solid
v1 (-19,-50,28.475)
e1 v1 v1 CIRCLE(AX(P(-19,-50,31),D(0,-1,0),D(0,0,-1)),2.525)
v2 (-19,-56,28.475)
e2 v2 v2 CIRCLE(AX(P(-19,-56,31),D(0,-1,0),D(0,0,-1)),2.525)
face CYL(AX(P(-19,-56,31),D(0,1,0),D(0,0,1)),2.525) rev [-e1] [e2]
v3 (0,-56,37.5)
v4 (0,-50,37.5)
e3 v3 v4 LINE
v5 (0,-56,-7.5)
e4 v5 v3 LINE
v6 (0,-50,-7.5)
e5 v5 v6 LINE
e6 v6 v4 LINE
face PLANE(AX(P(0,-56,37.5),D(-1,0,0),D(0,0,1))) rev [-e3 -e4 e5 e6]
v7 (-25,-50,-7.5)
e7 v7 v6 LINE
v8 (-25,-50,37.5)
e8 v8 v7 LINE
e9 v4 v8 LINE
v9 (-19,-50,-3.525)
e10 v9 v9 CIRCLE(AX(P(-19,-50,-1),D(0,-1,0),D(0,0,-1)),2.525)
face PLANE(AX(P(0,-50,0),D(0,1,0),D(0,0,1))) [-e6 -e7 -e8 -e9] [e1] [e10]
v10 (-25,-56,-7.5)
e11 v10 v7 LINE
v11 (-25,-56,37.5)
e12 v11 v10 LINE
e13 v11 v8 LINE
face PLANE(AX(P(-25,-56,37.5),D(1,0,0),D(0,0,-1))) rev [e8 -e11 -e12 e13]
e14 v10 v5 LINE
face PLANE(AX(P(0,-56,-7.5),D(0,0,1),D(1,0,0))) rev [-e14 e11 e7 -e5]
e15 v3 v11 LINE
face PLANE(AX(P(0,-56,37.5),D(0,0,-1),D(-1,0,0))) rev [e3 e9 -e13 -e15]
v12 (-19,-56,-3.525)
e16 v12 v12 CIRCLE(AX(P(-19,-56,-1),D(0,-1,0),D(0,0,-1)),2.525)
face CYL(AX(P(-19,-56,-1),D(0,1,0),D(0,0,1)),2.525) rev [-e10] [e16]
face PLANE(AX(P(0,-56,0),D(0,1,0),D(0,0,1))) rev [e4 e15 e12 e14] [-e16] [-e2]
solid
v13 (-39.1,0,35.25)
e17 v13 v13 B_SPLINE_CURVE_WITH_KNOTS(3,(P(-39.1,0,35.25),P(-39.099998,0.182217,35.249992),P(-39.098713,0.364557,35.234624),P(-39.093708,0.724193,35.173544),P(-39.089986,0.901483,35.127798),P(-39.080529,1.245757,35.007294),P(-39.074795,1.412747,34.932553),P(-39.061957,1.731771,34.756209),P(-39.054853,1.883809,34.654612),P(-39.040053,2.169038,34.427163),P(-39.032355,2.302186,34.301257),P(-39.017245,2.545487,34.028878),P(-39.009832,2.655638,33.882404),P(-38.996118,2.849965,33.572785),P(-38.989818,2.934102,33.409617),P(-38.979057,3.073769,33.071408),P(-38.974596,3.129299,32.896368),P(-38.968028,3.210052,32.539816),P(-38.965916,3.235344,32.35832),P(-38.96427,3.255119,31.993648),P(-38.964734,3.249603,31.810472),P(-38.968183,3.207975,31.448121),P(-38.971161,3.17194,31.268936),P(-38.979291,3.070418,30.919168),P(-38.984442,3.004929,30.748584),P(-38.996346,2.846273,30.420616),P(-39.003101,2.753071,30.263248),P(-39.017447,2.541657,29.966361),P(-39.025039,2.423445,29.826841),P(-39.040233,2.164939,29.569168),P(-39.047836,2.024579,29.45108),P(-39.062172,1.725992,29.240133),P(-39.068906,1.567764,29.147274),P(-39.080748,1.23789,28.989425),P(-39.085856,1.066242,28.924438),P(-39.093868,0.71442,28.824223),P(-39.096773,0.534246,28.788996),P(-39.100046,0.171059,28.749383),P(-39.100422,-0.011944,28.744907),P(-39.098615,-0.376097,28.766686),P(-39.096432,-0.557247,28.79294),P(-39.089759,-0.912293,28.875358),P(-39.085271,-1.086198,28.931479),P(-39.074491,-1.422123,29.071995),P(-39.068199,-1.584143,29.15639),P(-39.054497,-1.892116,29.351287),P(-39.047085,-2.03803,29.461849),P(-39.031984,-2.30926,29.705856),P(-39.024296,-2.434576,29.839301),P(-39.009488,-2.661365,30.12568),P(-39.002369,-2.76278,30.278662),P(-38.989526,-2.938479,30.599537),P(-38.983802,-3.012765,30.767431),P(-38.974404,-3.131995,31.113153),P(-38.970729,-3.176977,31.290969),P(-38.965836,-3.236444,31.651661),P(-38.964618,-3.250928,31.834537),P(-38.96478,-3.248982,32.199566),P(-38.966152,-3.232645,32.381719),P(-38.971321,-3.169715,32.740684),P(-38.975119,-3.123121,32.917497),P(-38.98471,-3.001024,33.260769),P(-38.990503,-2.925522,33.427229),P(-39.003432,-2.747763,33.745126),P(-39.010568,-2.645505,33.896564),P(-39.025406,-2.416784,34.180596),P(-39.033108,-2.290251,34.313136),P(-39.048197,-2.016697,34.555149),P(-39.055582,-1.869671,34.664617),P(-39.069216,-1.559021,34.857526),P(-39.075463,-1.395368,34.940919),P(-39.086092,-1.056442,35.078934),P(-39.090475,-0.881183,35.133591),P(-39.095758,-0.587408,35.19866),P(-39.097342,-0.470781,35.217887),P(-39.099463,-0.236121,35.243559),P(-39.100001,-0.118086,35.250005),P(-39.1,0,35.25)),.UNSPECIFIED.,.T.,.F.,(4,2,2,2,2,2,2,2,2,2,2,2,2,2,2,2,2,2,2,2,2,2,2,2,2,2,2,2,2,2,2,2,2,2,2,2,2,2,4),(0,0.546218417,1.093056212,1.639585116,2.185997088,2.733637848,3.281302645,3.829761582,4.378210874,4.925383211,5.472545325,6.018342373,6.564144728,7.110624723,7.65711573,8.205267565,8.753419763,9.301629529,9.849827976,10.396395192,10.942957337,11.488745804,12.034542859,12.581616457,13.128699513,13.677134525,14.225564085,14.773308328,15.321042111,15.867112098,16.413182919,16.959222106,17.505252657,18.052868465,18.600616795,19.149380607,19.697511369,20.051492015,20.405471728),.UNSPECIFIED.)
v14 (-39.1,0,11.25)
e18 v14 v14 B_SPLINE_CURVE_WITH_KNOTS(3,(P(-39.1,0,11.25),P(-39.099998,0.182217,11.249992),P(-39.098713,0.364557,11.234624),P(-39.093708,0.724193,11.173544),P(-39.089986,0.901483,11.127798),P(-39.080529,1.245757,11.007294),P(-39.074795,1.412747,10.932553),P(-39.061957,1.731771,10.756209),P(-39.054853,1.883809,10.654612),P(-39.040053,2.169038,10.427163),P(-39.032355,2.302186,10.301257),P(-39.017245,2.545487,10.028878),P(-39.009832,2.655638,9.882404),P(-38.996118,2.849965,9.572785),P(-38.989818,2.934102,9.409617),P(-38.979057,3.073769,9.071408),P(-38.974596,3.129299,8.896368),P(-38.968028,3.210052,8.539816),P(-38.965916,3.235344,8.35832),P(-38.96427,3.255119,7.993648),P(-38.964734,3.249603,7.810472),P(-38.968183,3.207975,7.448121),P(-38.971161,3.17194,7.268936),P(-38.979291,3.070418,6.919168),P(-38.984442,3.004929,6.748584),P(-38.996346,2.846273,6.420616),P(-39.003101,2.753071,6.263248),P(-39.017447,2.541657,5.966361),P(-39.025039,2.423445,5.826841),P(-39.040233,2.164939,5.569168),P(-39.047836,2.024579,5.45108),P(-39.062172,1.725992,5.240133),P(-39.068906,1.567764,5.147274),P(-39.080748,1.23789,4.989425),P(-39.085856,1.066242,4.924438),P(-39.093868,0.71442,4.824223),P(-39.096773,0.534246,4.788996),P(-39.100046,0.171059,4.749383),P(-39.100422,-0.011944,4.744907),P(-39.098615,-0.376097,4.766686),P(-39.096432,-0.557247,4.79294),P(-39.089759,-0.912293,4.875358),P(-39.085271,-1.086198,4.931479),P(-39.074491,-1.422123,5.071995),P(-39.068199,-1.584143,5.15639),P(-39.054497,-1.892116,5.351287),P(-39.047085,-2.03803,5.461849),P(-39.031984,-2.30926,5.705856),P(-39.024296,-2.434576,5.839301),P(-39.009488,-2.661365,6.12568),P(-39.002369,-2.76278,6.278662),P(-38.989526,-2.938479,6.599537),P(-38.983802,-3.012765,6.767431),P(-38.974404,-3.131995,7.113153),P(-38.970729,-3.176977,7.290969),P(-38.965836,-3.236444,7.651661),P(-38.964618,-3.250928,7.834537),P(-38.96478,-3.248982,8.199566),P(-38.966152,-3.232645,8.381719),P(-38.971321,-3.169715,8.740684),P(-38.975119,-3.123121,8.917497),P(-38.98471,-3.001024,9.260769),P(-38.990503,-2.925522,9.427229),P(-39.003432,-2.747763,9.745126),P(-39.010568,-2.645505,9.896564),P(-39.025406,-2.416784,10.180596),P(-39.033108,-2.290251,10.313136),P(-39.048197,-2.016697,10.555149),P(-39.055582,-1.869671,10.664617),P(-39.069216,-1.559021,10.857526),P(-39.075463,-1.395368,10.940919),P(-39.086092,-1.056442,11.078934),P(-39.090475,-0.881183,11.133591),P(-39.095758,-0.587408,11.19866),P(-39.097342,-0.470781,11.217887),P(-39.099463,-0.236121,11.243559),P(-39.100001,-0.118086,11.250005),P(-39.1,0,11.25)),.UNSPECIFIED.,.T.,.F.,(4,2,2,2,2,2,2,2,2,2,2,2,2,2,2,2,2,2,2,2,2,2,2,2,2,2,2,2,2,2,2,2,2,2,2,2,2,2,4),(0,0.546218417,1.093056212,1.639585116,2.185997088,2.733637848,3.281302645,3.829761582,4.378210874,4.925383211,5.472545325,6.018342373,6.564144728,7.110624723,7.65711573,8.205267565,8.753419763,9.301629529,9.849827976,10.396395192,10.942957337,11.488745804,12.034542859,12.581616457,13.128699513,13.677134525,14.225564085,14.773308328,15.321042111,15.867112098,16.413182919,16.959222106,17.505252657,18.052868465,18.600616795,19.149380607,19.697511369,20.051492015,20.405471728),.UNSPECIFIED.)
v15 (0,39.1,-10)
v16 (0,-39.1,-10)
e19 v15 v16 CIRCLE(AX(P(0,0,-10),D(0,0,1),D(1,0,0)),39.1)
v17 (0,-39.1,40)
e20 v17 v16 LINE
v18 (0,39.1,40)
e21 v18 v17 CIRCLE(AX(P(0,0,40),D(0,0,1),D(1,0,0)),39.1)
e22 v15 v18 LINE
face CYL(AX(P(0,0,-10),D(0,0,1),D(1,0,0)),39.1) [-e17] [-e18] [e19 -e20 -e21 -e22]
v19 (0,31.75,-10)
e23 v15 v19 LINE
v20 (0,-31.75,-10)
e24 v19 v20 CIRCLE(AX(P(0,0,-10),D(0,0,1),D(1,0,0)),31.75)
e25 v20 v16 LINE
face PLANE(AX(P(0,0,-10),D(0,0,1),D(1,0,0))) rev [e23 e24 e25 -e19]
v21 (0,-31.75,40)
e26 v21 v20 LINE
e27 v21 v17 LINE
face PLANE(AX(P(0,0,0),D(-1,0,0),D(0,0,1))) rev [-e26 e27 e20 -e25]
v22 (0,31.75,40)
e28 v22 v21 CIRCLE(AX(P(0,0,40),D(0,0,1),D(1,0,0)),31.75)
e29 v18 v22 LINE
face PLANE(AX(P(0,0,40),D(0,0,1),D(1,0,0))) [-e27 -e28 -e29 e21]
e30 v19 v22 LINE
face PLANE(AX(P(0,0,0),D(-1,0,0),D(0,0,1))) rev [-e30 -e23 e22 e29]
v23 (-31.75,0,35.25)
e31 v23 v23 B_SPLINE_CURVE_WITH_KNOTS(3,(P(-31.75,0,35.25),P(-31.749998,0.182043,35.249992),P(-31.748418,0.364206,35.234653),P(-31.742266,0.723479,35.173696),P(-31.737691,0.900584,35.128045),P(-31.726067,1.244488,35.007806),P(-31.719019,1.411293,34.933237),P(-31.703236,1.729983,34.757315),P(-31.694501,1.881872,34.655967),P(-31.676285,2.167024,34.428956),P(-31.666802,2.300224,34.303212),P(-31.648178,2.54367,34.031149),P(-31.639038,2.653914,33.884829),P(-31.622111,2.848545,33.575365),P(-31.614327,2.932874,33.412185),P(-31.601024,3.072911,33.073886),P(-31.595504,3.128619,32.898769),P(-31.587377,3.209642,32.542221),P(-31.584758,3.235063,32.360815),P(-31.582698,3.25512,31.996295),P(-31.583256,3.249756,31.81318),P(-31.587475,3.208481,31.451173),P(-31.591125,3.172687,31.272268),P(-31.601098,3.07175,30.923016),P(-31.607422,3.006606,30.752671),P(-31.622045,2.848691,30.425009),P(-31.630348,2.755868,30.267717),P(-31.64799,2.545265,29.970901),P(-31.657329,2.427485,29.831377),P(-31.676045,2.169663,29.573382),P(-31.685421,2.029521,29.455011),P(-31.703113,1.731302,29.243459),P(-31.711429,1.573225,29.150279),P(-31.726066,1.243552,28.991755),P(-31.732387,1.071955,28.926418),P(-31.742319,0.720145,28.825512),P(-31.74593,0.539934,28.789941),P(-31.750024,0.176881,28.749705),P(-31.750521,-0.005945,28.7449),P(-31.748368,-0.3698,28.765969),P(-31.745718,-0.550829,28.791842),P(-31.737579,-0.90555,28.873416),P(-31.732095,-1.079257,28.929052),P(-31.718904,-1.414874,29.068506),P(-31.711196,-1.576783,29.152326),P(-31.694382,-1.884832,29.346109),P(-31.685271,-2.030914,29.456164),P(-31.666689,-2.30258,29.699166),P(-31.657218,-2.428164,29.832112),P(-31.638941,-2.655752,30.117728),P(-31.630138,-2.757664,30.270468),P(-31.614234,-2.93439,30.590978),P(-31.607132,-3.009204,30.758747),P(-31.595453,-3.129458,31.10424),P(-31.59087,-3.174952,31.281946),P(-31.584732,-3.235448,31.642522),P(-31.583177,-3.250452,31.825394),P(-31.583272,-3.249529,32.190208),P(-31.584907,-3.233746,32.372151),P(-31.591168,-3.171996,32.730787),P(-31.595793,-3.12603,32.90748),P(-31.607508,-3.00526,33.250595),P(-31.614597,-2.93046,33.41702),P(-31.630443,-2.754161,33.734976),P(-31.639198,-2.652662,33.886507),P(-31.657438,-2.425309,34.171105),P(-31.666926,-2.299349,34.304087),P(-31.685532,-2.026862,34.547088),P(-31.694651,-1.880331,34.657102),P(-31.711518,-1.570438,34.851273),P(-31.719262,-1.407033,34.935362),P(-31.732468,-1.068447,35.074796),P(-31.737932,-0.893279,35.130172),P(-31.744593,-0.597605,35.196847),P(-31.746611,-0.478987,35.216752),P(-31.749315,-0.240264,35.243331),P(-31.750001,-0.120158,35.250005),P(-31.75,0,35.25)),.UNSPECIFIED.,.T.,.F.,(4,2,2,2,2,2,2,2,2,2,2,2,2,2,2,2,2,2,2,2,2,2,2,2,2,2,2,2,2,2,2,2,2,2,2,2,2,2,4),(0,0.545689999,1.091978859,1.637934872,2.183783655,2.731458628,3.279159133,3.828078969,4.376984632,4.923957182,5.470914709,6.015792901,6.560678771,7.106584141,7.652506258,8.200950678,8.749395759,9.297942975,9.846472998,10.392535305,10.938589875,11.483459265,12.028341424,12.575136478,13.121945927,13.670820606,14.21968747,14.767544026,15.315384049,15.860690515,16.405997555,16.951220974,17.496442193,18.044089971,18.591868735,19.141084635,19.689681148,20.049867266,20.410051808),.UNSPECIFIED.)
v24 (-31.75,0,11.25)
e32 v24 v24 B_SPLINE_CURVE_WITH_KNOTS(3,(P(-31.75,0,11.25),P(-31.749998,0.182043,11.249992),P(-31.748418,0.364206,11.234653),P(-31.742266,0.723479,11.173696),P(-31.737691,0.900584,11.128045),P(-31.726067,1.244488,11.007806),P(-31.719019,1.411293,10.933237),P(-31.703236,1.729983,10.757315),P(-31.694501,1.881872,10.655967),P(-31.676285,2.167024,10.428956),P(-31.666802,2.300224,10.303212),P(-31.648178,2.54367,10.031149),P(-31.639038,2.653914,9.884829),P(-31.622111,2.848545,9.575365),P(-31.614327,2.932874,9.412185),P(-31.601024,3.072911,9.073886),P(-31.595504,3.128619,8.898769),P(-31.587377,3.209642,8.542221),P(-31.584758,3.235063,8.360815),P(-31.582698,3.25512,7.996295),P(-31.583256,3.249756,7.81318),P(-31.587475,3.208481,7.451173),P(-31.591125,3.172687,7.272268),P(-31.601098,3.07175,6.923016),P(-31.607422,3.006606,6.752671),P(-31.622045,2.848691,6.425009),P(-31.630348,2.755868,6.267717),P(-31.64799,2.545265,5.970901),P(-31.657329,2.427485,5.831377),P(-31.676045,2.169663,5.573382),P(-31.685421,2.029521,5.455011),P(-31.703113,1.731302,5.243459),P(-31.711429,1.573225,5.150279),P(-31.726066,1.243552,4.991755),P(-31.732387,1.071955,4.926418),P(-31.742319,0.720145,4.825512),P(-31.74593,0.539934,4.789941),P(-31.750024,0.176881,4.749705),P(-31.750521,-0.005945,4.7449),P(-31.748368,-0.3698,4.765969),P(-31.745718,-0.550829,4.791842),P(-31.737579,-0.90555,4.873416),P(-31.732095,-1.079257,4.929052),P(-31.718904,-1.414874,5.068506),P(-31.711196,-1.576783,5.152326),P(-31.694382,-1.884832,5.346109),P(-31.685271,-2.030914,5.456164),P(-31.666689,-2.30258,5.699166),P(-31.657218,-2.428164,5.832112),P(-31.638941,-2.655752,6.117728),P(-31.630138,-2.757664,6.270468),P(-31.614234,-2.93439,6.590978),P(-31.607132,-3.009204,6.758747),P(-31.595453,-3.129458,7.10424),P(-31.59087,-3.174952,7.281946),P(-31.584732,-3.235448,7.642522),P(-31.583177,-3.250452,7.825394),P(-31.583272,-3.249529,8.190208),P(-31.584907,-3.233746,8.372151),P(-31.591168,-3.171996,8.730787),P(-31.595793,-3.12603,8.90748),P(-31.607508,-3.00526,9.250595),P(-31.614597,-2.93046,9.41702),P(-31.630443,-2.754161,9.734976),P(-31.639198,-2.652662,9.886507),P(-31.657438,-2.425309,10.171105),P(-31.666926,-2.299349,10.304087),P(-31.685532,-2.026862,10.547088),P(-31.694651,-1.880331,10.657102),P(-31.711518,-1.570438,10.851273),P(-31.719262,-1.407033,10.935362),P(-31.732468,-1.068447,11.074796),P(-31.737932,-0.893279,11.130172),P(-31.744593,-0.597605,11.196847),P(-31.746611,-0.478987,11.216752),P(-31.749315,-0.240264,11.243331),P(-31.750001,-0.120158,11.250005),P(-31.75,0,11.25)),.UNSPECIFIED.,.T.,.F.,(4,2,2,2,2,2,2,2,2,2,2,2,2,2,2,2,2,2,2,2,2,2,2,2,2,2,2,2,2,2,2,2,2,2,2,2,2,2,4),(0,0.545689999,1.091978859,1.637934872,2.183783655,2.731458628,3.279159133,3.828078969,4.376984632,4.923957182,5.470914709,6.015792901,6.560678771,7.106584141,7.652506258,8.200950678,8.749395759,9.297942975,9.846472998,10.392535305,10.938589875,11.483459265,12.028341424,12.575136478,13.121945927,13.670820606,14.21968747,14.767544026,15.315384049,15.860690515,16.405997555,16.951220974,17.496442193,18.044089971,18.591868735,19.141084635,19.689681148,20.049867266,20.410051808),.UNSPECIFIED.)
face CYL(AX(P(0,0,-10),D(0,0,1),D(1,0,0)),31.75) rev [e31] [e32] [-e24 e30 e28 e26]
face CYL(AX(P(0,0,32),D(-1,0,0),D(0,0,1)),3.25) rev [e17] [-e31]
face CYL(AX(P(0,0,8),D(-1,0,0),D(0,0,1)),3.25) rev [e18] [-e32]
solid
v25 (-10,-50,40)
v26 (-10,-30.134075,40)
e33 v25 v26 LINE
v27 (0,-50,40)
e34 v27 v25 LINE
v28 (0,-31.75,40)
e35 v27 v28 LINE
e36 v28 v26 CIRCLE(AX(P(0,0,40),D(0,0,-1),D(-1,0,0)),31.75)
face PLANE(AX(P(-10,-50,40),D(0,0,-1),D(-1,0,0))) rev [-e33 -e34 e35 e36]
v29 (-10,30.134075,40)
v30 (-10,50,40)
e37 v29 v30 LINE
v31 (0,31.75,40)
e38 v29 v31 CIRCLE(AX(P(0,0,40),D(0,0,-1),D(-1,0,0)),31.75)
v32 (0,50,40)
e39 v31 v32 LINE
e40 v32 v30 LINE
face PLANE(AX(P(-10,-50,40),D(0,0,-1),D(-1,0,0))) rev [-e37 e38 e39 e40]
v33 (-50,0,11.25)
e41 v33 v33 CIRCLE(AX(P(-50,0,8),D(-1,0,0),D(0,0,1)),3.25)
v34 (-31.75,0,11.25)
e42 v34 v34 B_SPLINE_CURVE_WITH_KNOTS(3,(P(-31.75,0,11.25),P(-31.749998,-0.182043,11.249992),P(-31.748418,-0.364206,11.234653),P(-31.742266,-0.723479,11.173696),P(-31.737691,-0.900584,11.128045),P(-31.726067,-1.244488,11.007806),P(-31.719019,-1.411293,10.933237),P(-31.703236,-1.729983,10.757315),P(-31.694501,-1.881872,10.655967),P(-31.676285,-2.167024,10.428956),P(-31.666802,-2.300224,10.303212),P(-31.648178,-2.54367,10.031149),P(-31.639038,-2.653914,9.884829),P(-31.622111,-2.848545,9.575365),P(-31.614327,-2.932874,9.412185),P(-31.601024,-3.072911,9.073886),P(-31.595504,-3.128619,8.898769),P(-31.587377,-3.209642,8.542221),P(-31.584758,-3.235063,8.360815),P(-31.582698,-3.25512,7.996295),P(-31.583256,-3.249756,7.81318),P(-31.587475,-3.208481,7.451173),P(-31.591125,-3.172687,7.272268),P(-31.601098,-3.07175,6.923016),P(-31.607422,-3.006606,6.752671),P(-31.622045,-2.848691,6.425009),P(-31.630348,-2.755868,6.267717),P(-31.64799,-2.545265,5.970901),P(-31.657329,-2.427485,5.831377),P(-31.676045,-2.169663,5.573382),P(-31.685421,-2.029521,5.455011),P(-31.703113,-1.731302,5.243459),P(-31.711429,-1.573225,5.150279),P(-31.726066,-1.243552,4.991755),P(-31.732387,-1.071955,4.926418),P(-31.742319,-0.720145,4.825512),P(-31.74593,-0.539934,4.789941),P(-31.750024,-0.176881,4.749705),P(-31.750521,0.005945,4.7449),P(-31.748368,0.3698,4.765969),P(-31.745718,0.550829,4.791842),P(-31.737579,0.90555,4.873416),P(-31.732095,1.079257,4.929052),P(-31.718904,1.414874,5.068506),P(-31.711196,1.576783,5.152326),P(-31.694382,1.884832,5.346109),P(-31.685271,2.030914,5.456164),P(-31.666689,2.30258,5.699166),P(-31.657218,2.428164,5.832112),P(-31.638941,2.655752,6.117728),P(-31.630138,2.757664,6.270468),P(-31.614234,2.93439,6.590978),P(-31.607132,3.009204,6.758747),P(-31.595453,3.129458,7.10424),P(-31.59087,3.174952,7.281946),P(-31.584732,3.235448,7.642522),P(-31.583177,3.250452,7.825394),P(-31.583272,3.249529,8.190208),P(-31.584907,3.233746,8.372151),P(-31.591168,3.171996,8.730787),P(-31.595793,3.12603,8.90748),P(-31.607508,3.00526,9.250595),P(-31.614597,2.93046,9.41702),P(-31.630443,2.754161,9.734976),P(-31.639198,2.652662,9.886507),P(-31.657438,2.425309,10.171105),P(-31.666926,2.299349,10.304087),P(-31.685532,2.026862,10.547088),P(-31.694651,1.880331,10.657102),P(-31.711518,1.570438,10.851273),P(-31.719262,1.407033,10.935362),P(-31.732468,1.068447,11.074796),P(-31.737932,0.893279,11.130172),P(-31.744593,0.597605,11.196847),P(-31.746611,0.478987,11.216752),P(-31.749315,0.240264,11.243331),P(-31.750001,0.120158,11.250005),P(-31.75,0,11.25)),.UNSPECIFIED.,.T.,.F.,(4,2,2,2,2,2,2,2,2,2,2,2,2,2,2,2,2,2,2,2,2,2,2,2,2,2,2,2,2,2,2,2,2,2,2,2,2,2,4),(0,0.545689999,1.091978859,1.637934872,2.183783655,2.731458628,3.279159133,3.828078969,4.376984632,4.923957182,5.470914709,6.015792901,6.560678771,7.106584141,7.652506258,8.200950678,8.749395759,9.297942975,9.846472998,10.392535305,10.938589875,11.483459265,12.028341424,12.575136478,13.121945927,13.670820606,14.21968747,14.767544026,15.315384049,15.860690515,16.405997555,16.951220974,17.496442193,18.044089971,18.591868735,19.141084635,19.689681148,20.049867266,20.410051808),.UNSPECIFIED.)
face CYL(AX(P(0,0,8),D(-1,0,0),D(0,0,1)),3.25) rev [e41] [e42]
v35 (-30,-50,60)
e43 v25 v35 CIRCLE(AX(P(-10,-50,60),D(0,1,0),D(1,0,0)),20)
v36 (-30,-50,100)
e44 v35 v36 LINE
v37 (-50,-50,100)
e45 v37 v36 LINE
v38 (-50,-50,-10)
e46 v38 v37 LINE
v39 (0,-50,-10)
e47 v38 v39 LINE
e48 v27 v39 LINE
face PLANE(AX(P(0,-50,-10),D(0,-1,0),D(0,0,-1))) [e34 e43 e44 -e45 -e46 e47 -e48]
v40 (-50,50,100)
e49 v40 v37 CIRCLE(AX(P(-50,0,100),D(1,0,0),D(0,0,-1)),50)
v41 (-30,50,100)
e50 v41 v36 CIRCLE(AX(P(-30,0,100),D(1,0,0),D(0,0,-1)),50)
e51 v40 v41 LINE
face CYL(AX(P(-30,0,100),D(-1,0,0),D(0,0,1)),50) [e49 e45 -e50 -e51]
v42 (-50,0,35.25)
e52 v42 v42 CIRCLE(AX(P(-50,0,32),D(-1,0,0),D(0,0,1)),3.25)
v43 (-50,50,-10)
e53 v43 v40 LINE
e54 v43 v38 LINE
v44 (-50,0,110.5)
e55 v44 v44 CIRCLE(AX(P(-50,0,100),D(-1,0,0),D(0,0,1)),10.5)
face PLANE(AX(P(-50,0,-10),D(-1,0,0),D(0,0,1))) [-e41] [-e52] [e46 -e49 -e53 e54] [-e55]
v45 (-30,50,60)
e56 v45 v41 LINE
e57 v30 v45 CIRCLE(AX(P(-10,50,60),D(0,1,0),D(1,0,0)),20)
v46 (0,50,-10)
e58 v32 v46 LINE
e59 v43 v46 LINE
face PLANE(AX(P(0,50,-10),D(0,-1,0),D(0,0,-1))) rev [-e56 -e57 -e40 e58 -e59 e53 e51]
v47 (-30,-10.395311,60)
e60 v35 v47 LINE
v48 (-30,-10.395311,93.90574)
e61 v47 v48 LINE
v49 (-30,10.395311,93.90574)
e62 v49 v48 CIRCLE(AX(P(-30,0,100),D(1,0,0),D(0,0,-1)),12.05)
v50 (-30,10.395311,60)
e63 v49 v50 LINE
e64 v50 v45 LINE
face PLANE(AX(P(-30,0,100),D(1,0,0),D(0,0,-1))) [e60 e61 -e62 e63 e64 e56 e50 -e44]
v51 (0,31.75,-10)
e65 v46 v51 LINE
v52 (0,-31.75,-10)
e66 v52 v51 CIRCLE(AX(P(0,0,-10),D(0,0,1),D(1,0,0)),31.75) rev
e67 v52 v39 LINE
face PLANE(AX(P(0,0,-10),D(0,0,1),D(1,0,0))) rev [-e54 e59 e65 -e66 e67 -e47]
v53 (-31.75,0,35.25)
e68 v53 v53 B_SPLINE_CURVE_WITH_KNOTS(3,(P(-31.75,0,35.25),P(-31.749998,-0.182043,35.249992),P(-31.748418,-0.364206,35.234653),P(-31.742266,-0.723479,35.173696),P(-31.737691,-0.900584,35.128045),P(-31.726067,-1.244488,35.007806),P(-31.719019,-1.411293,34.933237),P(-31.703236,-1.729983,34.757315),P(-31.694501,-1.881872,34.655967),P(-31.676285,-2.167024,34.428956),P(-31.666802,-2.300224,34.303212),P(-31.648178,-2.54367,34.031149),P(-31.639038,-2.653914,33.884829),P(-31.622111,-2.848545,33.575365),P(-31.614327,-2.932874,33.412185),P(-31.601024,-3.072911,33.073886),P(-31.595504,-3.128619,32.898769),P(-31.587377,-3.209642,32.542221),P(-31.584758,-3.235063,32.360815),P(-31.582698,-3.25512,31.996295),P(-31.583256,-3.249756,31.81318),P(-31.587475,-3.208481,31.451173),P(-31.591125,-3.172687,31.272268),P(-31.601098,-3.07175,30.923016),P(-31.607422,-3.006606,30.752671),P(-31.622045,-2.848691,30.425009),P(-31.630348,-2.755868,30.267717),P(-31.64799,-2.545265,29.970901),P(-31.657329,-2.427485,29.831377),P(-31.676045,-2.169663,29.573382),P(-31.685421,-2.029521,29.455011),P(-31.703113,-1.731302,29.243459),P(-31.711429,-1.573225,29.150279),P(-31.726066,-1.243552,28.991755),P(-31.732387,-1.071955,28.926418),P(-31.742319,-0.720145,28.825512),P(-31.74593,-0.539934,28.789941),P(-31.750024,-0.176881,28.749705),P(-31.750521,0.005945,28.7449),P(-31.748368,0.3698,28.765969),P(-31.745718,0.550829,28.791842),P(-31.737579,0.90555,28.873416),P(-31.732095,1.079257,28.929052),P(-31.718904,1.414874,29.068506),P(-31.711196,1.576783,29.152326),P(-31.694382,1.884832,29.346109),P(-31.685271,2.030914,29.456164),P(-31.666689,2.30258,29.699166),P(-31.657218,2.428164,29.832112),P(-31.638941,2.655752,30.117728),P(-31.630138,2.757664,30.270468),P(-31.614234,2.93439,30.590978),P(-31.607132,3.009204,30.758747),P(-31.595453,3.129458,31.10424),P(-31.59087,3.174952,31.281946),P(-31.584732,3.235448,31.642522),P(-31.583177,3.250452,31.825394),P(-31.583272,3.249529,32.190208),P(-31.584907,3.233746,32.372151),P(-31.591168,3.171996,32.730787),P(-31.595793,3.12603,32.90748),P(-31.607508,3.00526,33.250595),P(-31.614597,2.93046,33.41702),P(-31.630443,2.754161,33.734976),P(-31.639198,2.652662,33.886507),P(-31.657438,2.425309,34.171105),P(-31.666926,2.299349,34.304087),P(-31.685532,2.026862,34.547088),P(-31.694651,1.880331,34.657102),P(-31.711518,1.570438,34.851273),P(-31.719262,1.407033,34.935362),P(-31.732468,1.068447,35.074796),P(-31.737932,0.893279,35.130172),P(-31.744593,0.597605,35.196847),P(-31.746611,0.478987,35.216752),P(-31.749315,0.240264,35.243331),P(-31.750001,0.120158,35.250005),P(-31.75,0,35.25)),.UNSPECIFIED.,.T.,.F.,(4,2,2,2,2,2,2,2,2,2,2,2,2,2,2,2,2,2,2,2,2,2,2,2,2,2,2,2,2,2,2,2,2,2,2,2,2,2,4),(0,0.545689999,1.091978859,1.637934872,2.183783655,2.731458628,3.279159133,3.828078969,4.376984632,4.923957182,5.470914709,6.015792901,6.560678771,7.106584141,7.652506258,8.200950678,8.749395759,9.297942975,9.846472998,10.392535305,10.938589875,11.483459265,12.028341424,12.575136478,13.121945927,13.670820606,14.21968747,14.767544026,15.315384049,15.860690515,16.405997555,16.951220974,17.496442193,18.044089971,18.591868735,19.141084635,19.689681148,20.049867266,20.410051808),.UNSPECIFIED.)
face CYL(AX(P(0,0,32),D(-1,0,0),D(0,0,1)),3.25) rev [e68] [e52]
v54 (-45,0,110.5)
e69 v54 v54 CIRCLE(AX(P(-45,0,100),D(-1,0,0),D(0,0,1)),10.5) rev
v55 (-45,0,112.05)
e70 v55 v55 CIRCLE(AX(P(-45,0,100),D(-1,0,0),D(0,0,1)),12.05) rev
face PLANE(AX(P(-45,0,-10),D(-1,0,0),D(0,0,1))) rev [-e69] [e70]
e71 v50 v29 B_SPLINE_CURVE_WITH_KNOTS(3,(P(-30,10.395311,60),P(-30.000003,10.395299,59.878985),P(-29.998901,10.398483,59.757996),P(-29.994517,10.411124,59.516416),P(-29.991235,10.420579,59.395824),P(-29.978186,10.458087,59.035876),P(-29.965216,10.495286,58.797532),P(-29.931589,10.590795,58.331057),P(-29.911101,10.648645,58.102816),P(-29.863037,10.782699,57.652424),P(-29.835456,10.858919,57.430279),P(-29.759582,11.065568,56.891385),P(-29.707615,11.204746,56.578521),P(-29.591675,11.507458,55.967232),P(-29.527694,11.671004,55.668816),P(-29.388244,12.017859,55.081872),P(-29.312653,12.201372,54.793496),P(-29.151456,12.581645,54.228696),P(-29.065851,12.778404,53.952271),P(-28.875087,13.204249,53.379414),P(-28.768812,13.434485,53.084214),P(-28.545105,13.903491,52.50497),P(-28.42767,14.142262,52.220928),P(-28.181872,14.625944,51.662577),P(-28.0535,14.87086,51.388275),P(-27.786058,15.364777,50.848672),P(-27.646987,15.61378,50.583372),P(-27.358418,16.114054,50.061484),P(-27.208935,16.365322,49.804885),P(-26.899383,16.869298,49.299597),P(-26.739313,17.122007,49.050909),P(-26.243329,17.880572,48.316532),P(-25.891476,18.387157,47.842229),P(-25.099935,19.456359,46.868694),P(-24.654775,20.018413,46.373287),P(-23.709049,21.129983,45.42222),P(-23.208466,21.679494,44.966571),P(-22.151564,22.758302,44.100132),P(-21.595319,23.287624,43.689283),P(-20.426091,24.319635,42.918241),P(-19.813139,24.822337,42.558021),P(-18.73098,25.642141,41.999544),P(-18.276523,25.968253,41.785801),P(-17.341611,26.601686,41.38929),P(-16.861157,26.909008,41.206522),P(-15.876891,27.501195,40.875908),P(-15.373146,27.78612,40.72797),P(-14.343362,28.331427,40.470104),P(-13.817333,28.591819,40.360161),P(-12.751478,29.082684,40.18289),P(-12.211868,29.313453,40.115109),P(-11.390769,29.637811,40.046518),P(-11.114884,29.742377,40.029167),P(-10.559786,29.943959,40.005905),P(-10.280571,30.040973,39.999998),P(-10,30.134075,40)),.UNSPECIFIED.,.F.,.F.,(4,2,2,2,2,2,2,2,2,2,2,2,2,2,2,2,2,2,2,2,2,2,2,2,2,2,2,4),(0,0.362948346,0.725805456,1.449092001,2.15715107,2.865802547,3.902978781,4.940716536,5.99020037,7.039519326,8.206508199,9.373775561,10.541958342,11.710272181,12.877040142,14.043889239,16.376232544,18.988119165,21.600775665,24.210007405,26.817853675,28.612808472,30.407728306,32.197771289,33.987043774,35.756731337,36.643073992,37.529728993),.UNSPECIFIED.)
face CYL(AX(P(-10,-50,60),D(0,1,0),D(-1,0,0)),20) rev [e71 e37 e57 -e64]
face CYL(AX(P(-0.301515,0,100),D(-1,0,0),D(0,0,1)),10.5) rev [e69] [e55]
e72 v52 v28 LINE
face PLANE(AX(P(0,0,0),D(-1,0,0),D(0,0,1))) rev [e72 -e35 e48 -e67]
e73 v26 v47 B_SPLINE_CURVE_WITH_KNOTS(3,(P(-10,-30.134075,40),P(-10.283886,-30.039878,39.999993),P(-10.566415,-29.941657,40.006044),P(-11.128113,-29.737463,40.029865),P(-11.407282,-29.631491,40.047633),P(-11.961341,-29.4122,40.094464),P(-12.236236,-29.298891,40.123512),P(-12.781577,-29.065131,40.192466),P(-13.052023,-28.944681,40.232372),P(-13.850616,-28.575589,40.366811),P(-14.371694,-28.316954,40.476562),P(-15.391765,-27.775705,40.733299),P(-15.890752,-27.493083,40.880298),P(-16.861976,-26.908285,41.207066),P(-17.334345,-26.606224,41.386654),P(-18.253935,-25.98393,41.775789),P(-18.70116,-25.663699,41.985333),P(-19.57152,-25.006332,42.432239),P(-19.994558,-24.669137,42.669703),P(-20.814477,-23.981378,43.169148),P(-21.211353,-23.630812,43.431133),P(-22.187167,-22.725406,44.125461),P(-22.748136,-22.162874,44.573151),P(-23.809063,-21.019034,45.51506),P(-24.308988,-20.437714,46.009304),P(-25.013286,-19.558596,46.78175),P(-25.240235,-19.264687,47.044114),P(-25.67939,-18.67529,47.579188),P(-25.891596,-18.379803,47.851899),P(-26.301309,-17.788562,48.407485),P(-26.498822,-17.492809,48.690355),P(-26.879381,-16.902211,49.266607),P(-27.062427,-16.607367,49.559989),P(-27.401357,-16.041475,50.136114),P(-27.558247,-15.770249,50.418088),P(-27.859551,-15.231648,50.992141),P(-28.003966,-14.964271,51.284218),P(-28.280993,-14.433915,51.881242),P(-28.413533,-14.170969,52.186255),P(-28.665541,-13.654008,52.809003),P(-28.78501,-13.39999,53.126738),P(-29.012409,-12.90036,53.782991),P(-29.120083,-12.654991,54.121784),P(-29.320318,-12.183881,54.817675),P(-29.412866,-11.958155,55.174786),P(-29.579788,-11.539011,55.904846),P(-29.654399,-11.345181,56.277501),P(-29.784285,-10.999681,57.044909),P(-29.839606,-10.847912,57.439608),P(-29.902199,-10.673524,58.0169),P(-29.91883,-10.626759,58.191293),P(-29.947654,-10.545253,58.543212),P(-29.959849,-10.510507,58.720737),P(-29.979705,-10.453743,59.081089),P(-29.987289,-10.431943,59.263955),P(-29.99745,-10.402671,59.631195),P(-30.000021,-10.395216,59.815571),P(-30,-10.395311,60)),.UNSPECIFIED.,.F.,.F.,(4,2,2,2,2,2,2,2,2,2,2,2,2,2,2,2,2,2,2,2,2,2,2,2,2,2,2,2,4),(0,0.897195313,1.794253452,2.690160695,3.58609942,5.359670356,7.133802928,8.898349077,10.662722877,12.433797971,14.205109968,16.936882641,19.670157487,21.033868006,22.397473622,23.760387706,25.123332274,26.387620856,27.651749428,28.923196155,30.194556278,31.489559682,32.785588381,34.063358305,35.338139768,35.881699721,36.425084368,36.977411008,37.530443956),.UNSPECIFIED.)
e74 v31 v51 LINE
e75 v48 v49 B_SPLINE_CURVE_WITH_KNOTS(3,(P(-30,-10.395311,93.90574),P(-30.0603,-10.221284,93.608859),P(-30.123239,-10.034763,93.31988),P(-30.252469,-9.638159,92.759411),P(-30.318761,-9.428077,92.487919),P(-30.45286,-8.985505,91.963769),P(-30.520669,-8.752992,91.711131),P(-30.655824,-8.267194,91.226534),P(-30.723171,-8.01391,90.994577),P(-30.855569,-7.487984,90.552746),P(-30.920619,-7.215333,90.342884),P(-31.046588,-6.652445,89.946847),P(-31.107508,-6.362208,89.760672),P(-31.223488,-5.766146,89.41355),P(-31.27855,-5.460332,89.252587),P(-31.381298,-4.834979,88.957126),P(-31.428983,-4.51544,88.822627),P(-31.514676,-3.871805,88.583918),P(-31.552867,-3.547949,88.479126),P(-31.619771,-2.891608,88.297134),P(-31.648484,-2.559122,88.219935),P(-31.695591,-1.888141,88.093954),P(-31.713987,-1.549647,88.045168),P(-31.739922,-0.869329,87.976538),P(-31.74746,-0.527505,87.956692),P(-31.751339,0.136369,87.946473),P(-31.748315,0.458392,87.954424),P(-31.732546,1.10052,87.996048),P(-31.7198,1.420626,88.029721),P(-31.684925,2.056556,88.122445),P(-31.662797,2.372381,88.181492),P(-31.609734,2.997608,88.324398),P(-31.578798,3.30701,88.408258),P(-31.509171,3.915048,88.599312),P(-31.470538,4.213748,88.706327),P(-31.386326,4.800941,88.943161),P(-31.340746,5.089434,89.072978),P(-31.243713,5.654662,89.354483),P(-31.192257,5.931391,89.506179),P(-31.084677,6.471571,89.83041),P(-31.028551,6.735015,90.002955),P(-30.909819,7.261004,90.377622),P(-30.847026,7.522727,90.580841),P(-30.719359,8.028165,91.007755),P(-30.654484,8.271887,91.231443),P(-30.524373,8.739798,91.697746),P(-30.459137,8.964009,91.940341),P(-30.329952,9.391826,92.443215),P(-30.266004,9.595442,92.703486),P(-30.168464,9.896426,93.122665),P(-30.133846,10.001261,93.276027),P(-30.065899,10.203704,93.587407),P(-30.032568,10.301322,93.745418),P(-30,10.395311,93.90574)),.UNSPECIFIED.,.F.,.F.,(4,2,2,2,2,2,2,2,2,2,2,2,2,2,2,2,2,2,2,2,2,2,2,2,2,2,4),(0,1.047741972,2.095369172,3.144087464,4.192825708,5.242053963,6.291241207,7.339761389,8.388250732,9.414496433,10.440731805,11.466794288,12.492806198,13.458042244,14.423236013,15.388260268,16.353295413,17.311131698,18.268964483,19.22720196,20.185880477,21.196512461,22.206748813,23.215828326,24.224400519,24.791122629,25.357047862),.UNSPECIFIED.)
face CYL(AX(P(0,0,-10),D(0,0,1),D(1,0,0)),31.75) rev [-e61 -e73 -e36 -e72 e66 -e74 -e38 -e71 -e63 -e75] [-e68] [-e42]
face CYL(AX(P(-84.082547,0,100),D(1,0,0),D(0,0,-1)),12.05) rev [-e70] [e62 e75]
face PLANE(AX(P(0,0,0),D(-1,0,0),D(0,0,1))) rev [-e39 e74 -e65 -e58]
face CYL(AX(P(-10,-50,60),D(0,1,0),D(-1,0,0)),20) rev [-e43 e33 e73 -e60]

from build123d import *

# Parameters (mm, degrees)
CENTRE_HOLE_FOR_L2_DEPTH      = 40
CENTRE_HOLE_FOR_L2_DEPTH_BACK = 10
SKETCH1_R                     = 39.1
SKETCH1_R_2                   = 31.75
MAIN_STRUCTURE_DEPTH          = 60
MAIN_STRUCTURE_DEPTH_BACK     = 50
SKETCH2_W                     = 100
SKETCH2_H                     = 100
SKETCH2_R                     = 31.75
BEARING_CURVE_DEPTH           = 20
SHAFT_HOLE_REACH              = 189.083
SKETCH6_R                     = 10.5
WRIST_CUTOUT_DEPTH            = 188.082869365
SKETCH9_R                     = 12.05
BEARING_DEPTH                 = 15
SURFACECUT1_DEPTH             = 50
SKETCH13_W                    = 25
SKETCH13_H                    = 45
SKETCH13_R                    = 2.525
BOSS_EXTRUDE1_DEPTH           = 6
SKETCH14_R                    = 3.25
CUT_EXTRUDE2_DEPTH            = 168.7378908


# Read off the part's stored shape, not the designer's step: SurfaceCut1
with BuildPart() as part:
    # Sketch1 → Centre Hole for L2 (new, two sides: drawn at the far end of the back side and taken through both)
    with BuildSketch(Plane.XY.offset(-CENTRE_HOLE_FOR_L2_DEPTH_BACK)):
        Circle(SKETCH1_R)
        Circle(SKETCH1_R_2, mode=Mode.SUBTRACT)
    extrude(amount=CENTRE_HOLE_FOR_L2_DEPTH + CENTRE_HOLE_FOR_L2_DEPTH_BACK)


with BuildPart() as body_2:
    # Sketch2 → Main Structure (new, two sides: drawn at the far end of the back side and taken through both)
    with BuildSketch(Plane.XY.offset(40).offset(-MAIN_STRUCTURE_DEPTH_BACK)):
        Rectangle(SKETCH2_W, SKETCH2_H)
        Circle(SKETCH2_R, mode=Mode.SUBTRACT)
    extrude(amount=MAIN_STRUCTURE_DEPTH + MAIN_STRUCTURE_DEPTH_BACK)

    # Sketch3 → Bearing Curve (add)
    with BuildSketch(Plane.ZY.offset(50)):
        with BuildLine():
            Line((100, 50), (100, -50))
            ThreePointArc((100, -50), (150, 0), (100, 50))
        make_face()
    bearing_curve = extrude(amount=-BEARING_CURVE_DEPTH)

    # Upright Mirror: Bearing Curve across plane
    add(bearing_curve.mirror(Plane(origin=(0, 0, 0), x_dir=(0, 0, 1), z_dir=(1, 0, 0))))

    # Shaft Hole: up to this face of the body (flat: up to its plane)
    shaft_hole_end = Plane(body_2.part.faces().sort_by_distance((-30, 0, 121.220659079))[0])
    # Sketch6 → Shaft Hole (cut, up to the picked face)
    with BuildSketch(Plane.ZY.offset(50), mode=Mode.PRIVATE) as shaft_hole_sk1:
        with Locations((100, 0)):
            Circle(SKETCH6_R)
    shaft_hole_tool1 = split(extrude(shaft_hole_sk1.sketch, amount=-SHAFT_HOLE_REACH, mode=Mode.PRIVATE), bisect_by=shaft_hole_end, keep=Keep.BOTH, mode=Mode.PRIVATE)
    add(shaft_hole_tool1.solids().sort_by(Axis((-50, 0, 100), (1, 0, 0)))[0], mode=Mode.SUBTRACT)

    # Sketch4 → Wrist Cutout (cut, through all)
    with BuildSketch(Plane(origin=(0, 50, 0), x_dir=(1, 0, 0), z_dir=(0, 1, 0))):
        with BuildLine():
            Line((-30, -100), (-30, -60))
            ThreePointArc((-30, -60), (-24.142135624, -45.857864376), (-10, -40))
            Line((-10, -40), (10, -40))
            ThreePointArc((10, -40), (24.142135624, -45.857864376), (30, -60))
            Line((30, -60), (30, -100))
            Line((30, -100), (-30, -100))
        make_face()
    extrude(amount=-WRIST_CUTOUT_DEPTH, mode=Mode.SUBTRACT)

    # Sketch9 → Bearing (cut)
    with BuildSketch(Plane(origin=(-30, 0, 0), x_dir=(0, 0, -1), z_dir=(1, 0, 0))):
        with Locations(Location((-100, 0, 0), (0, 0, 59.619002111))):
            Circle(SKETCH9_R)
    extrude(amount=-BEARING_DEPTH, mode=Mode.SUBTRACT)


with BuildPart() as surfacecut1_tool:
    # SurfaceCut1 outline → SurfaceCut1 (new body)
    with BuildSketch(Plane.YZ):
        with BuildLine():
            ThreePointArc((50, 100), (0, 150), (-50, 100))
            Line((-50, 100), (-50, -10))
            Line((-50, -10), (50, -10))
            Line((50, -10), (50, 100))
        make_face()
    extrude(amount=SURFACECUT1_DEPTH)


with BuildPart() as part_1:
    add(part.part)

    # SurfaceCut1: cut by surfacecut1_tool
    add(surfacecut1_tool.part, mode=Mode.SUBTRACT)


with BuildPart() as body_2_1:
    add(body_2.part)

    # SurfaceCut1: cut by surfacecut1_tool
    add(surfacecut1_tool.part, mode=Mode.SUBTRACT)


with BuildPart() as body_3:
    # Sketch13 → Boss-Extrude1 (new body)
    with BuildSketch(Plane(origin=(0, -50, 0), x_dir=(-1, 0, 0), z_dir=(0, -1, 0))):
        with Locations((12.5, -15)):
            Rectangle(SKETCH13_W, SKETCH13_H)
        with Locations(Location((19, -31, 0), (0, 0, 90))):
            Circle(SKETCH13_R, mode=Mode.SUBTRACT)
        with Locations(Location((19, 1, 0), (0, 0, 90))):
            Circle(SKETCH13_R, mode=Mode.SUBTRACT)
    extrude(amount=BOSS_EXTRUDE1_DEPTH)


with BuildPart() as cut_extrude2_tool:
    # Sketch14 → Cut-Extrude2 (new, through all)
    with BuildSketch(Plane.ZY.offset(50)):
        with Locations((8, 0)):
            Circle(SKETCH14_R)
        with Locations((32, 0)):
            Circle(SKETCH14_R)
    extrude(amount=-CUT_EXTRUDE2_DEPTH)


with BuildPart() as part_2:
    add(part_1.part)

    # Cut-Extrude2: cut by cut_extrude2_tool
    add(cut_extrude2_tool.part, mode=Mode.SUBTRACT)


with BuildPart() as body_2_2:
    add(body_2_1.part)

    # Cut-Extrude2: cut by cut_extrude2_tool
    add(cut_extrude2_tool.part, mode=Mode.SUBTRACT)


solid = Compound([body_3.part, part_2.part, body_2_2.part])
